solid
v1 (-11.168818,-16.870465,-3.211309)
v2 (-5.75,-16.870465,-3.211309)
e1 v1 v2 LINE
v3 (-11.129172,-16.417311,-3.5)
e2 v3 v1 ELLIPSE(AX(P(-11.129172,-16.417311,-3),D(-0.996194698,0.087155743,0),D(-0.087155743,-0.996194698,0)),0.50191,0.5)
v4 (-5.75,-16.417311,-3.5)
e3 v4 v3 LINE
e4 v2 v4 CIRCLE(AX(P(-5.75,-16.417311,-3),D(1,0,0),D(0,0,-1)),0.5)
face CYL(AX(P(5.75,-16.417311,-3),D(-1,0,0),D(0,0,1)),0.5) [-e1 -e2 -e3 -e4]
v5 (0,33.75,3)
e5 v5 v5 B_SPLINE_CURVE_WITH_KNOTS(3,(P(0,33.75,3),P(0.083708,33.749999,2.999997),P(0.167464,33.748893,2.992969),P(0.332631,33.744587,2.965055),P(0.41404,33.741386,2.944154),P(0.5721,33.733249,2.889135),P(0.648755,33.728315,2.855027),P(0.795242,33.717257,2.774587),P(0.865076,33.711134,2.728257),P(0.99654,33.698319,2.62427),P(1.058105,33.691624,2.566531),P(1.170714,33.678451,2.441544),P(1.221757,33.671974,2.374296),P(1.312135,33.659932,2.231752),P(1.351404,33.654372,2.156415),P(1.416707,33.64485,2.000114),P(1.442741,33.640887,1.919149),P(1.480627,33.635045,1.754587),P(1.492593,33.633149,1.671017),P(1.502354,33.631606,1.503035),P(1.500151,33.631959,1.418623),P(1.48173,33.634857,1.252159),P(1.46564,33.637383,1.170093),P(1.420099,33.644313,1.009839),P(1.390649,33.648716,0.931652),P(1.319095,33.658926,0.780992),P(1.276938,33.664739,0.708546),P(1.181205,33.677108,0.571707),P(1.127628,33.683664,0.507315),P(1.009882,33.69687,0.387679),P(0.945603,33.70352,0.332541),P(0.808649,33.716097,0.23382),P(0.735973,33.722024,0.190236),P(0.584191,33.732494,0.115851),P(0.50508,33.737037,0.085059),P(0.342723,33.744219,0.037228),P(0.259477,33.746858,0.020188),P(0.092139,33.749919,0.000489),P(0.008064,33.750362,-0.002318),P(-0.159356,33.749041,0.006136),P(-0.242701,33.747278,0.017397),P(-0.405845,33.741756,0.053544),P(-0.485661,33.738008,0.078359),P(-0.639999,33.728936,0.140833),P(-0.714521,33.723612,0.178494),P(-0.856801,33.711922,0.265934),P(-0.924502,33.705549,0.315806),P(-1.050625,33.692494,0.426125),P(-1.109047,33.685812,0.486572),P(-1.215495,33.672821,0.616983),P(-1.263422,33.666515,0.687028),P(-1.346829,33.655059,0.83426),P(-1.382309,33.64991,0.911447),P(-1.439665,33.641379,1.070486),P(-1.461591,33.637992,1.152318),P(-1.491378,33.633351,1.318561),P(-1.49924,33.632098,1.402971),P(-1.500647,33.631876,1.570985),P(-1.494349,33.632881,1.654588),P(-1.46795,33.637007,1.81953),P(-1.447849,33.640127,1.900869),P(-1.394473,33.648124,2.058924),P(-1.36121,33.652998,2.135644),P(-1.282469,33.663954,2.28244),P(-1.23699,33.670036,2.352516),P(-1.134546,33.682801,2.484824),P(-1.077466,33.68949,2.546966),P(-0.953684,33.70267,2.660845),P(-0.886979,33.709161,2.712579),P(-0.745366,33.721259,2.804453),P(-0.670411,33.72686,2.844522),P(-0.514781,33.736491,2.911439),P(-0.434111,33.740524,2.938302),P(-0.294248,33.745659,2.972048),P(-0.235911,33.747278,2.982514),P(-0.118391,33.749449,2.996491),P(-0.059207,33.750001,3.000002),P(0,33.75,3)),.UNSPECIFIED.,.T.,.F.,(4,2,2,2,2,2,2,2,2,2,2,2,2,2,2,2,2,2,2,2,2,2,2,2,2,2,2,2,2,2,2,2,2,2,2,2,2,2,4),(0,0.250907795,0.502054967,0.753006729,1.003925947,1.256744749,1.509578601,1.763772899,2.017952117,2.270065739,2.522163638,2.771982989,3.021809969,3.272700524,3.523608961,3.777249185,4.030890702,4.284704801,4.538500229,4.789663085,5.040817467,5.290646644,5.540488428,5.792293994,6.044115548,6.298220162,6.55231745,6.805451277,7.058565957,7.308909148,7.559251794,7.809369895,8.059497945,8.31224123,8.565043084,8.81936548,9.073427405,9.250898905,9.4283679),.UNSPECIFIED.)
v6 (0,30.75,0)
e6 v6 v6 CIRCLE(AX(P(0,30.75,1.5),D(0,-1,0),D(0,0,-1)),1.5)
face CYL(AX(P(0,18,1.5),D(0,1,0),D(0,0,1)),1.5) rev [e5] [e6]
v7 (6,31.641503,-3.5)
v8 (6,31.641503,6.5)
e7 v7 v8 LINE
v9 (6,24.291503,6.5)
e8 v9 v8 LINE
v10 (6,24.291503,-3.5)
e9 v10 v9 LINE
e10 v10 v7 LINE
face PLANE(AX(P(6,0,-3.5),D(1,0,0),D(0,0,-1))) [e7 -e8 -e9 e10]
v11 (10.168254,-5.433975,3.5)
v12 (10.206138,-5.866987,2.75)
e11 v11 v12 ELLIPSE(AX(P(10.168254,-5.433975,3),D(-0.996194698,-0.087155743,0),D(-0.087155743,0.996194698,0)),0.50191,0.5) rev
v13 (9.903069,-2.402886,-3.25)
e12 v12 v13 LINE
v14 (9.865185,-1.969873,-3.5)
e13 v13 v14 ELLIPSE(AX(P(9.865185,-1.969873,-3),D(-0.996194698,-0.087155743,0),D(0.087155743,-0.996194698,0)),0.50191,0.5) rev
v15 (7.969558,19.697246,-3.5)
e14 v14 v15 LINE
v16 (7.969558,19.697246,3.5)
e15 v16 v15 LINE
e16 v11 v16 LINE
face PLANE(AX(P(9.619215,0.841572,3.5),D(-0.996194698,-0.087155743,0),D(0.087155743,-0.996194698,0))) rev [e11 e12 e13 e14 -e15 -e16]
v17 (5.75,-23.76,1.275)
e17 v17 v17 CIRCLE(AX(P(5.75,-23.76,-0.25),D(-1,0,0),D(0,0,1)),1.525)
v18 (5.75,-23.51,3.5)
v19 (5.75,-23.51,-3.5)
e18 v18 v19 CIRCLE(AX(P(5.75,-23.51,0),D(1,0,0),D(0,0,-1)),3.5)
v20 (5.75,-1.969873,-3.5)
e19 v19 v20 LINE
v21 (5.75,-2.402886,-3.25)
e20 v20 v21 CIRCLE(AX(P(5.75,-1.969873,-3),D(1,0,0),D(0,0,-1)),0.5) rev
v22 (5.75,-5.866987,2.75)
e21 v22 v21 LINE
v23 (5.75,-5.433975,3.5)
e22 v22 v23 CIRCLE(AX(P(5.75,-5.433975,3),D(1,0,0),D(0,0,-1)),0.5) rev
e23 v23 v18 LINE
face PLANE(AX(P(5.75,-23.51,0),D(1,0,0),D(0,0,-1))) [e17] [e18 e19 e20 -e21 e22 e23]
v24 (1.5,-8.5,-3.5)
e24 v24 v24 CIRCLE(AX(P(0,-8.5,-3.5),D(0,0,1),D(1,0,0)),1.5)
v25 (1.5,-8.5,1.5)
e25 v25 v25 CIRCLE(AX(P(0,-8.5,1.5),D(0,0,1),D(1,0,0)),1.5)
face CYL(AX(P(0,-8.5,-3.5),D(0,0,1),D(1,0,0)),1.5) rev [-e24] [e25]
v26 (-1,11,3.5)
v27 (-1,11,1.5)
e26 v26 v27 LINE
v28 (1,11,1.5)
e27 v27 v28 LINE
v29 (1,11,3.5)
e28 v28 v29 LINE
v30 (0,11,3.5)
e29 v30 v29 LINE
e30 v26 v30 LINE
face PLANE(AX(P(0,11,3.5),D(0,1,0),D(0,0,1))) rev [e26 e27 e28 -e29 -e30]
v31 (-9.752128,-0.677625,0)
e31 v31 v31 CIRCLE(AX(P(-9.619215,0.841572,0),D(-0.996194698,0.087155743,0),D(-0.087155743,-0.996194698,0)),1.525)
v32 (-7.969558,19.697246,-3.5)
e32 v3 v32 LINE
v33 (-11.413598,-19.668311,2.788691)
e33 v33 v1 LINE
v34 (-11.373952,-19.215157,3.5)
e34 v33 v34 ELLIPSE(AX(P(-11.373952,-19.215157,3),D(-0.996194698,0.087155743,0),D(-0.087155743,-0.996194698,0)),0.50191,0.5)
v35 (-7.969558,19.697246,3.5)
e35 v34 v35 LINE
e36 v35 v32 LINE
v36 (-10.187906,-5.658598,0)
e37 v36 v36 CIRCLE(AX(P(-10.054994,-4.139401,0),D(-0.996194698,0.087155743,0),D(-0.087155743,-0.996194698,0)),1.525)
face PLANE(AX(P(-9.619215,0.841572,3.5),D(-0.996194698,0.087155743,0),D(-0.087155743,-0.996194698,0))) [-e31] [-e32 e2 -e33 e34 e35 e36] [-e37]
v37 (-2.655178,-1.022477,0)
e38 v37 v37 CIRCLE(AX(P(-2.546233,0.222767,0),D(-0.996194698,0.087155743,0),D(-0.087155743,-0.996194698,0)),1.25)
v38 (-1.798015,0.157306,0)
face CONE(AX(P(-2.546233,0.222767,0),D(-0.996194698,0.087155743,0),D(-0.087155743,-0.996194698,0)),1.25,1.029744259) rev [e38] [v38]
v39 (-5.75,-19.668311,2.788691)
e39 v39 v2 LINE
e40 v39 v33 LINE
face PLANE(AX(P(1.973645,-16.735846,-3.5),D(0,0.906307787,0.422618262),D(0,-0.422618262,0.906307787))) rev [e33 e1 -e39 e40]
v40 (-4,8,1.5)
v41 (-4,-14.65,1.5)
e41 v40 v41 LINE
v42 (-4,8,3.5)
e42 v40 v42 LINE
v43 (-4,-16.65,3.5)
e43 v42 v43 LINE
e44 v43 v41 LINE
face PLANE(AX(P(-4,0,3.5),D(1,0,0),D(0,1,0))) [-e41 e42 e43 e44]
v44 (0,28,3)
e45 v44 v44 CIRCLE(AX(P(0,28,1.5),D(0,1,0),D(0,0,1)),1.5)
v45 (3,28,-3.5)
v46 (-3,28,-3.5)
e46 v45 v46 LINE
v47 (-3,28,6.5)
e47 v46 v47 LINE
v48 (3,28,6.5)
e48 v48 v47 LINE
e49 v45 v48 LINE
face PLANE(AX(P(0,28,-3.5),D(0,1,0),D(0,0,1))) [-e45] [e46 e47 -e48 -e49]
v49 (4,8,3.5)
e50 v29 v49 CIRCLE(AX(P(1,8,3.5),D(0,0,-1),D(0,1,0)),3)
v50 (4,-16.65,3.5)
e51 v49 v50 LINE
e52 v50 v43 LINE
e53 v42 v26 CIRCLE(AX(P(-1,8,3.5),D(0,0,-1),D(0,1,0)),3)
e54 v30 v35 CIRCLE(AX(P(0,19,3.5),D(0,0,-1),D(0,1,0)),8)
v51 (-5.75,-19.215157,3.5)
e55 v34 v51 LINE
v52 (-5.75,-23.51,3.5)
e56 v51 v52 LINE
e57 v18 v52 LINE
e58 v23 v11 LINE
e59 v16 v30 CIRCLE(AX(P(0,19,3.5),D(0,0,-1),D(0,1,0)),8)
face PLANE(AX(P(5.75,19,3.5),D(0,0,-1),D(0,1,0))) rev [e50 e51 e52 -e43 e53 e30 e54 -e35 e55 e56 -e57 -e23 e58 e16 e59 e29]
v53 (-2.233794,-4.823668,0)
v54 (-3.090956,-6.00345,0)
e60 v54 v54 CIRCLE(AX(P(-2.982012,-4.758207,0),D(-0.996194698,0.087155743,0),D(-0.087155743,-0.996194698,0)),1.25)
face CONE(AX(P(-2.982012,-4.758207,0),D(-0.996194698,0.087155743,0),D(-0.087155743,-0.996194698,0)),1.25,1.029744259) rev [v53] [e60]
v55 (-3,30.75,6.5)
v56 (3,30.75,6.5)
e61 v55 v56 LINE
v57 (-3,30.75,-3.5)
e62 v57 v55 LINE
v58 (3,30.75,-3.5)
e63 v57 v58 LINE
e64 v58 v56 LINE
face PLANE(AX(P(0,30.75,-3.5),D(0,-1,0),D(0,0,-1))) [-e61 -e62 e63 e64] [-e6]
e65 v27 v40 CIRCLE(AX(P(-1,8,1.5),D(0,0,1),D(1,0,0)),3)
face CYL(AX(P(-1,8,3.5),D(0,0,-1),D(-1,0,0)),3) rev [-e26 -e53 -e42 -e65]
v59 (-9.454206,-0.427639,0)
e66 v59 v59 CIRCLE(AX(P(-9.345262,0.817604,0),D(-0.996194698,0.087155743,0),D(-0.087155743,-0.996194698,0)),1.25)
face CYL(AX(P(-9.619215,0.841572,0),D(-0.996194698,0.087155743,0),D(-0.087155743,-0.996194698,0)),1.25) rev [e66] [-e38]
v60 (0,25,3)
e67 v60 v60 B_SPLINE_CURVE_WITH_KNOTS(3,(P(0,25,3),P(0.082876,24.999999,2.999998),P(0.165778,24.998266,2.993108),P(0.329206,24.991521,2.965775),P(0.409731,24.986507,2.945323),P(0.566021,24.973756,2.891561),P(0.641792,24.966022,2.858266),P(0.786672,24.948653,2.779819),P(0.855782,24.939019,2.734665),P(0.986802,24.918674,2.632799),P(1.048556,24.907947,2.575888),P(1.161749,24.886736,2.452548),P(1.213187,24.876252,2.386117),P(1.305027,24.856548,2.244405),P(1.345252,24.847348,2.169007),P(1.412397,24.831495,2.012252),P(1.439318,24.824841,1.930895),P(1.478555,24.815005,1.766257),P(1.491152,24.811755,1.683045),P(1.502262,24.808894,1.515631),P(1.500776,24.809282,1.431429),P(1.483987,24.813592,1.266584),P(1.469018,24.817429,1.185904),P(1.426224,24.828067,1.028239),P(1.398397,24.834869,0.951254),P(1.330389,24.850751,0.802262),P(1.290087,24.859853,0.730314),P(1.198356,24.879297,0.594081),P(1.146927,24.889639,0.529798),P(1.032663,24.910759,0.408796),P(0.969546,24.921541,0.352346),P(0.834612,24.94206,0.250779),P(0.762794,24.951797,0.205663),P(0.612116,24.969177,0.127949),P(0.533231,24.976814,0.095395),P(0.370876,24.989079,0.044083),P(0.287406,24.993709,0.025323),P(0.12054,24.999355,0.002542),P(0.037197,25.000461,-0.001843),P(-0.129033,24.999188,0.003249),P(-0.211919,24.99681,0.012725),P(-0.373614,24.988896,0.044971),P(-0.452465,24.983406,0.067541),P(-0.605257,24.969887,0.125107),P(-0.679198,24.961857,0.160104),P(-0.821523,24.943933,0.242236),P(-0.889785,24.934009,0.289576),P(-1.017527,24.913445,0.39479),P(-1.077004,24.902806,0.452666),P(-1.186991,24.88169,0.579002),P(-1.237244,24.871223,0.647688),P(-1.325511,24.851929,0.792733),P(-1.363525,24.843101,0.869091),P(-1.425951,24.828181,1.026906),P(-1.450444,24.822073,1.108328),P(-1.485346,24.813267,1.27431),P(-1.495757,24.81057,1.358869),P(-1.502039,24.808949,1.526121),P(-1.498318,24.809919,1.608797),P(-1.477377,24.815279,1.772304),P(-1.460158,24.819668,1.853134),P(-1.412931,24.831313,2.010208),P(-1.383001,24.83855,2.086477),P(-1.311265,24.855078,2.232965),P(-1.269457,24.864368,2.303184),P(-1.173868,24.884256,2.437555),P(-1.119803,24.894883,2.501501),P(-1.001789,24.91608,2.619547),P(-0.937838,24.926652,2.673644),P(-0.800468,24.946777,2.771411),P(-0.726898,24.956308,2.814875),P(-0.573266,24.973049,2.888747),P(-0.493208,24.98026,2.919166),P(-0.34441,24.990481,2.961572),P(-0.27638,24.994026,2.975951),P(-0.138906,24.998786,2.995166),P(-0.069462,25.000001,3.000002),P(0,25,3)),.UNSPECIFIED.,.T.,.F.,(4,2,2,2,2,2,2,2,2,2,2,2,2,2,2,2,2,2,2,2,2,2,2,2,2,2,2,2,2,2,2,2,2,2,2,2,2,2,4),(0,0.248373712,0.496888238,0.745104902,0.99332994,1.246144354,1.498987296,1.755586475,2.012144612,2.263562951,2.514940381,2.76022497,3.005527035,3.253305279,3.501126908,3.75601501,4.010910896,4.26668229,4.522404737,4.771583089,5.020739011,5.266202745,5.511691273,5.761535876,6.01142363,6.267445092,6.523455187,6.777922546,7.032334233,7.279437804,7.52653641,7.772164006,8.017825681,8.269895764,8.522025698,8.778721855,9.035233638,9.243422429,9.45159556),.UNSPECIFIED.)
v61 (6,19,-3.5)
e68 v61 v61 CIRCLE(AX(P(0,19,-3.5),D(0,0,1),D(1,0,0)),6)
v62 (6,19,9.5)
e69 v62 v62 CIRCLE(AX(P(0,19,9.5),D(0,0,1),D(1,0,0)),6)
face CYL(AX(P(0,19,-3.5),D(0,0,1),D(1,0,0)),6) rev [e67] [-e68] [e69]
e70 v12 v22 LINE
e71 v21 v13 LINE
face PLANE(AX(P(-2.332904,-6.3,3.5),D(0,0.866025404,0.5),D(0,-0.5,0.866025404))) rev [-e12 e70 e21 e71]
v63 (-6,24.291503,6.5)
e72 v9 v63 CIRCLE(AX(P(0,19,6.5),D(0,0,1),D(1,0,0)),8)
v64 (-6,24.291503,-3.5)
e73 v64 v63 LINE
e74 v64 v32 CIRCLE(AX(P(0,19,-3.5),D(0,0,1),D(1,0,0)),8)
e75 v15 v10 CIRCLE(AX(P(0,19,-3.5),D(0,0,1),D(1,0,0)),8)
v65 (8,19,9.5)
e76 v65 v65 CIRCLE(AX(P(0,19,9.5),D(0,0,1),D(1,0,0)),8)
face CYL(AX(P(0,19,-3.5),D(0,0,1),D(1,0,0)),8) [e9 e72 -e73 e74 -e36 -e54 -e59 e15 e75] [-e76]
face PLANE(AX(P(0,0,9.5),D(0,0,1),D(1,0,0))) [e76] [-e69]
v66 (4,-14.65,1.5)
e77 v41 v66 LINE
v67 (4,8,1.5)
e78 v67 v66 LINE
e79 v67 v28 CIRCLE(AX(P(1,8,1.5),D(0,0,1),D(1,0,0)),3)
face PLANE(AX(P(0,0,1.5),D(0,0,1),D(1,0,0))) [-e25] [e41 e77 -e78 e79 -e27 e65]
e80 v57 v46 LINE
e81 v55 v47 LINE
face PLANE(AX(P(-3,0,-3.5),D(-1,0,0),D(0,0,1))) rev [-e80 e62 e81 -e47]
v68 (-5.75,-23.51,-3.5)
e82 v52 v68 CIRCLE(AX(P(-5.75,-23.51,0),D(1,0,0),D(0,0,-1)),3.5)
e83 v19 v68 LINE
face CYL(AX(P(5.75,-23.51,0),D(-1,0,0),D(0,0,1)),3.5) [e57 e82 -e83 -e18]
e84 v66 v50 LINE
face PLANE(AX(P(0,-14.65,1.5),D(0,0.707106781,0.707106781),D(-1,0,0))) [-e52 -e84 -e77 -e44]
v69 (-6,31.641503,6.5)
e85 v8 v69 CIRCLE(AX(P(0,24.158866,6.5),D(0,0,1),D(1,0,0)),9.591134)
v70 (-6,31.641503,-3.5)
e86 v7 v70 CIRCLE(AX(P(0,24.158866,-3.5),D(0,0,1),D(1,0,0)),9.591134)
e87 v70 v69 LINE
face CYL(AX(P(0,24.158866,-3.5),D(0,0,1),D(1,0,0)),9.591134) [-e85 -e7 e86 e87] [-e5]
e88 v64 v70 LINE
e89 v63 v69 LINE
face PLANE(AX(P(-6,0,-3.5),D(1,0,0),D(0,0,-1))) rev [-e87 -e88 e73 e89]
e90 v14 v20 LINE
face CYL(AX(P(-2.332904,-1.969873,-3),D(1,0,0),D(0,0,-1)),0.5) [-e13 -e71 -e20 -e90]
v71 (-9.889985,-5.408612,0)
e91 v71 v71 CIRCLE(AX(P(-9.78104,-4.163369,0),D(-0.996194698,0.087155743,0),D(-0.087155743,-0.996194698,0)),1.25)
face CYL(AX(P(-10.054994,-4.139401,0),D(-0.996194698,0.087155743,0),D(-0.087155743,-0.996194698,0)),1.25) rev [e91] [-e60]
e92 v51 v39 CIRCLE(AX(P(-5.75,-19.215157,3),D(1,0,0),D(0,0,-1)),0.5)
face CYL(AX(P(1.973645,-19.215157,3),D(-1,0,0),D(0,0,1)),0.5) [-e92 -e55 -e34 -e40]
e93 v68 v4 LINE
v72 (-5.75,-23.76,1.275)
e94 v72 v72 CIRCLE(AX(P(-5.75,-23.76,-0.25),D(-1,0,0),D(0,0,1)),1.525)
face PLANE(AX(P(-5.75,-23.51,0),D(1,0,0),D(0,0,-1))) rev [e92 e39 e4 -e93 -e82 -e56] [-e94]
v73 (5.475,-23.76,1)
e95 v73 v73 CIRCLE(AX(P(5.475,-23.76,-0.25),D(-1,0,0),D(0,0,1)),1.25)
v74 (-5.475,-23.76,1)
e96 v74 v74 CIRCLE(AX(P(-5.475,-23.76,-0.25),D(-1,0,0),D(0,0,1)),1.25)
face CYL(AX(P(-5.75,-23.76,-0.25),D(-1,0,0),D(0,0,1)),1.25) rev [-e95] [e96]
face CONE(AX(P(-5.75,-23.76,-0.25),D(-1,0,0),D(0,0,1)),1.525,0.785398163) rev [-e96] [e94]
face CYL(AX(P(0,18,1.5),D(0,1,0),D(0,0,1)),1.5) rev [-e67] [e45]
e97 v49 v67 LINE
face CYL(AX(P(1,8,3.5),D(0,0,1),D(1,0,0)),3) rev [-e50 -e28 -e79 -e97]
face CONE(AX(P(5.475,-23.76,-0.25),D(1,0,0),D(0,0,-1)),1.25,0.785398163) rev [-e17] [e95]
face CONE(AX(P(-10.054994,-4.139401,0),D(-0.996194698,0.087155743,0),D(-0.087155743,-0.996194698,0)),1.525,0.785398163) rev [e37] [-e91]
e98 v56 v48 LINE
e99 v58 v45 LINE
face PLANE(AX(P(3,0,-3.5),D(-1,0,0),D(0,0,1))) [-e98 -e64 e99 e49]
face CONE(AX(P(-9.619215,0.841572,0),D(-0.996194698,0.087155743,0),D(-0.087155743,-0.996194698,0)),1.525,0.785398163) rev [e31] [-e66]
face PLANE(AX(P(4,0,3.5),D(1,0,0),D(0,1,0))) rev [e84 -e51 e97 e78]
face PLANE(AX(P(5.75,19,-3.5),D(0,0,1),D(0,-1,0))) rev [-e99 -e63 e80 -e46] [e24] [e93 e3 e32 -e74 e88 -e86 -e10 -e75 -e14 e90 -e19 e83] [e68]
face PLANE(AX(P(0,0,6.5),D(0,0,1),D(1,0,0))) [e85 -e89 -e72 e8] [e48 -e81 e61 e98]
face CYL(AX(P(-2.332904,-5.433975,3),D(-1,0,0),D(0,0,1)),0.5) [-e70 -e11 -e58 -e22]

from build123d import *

# Parameters (mm, degrees)
SKETCH1_R                = 1
BOSS_EXTRUDE1_DEPTH      = 5.75
BOSS_EXTRUDE2_DEPTH      = 6.5
BOSS_EXTRUDE2_DEPTH_BACK = 3.5
SKETCH3_W                = 6
SKETCH3_H                = 2.75
BOSS_EXTRUDE3_DEPTH      = 9.5
BOSS_EXTRUDE3_DEPTH_BACK = 3.5
SKETCH3_5_R              = 8
SKETCH3_5_R_2            = 6
CUT_EXTRUDE1_DEPTH       = 36.96265424
CUT_EXTRUDE1_DEPTH_BACK  = 36.96265424
SKETCH3_6_R              = 6
SKETCH3_6_R_2            = 1.5
CUT_EXTRUDE3_START       = 1.5
SKETCH3_8_R              = 1.5
CUT_EXTRUDE3_DEPTH       = 2
FILLET1_R                = 3
CHAMFER1_SIZE            = 2
BOSS_EXTRUDE4_DEPTH      = 3.5
CUT_EXTRUDE5_DEPTH       = 4.494021888
CUT_EXTRUDE6_DEPTH       = 5.692616578
FILLET2_R                = 0.5
CUT_EXTRUDE8_DEPTH       = 57.979942817
CUT_EXTRUDE8_DEPTH_BACK  = 10
SKETCH11_R               = 1.5
LPATTERN1_COUNT          = 2
LPATTERN1_PITCH          = 5
SKETCH14_R               = 1
BOSS_EXTRUDE5_DEPTH      = 11.5


with BuildPart() as part:
    # Sketch1 → Boss-Extrude1 (new, symmetric)
    with BuildSketch(Plane(origin=(0, 0, 0), x_dir=(0, 0, -1), z_dir=(1, 0, 0))):
        with BuildLine():
            Line((-3.5, 19), (3.5, 19))
            Line((3.5, 19), (3.5, -23.51))
            ThreePointArc((3.5, -23.51), (0, -27.01), (-3.5, -23.51))
            Line((-3.5, -23.51), (-3.5, 19))
        make_face()
        with Locations((0.25, -23.76)):
            Circle(SKETCH1_R, mode=Mode.SUBTRACT)
    extrude(amount=BOSS_EXTRUDE1_DEPTH, both=True)



with BuildPart() as body_2:
    # Sketch3 → Boss-Extrude2 (new, two sides: drawn at the far end of the back side and taken through both)
    with BuildSketch(Plane.XY.offset(-BOSS_EXTRUDE2_DEPTH_BACK)):
        with BuildLine():
            ThreePointArc((-6, 24.291502622), (0, 27), (6, 24.291502622))
            Line((6, 24.291502622), (6, 31.641502622))
            ThreePointArc((6, 31.641502622), (0, 33.75), (-6, 31.641502622))
            Line((-6, 31.641502622), (-6, 24.291502622))
        make_face()
        with Locations((0, 29.375)):
            Rectangle(SKETCH3_W, SKETCH3_H, mode=Mode.SUBTRACT)
    extrude(amount=BOSS_EXTRUDE2_DEPTH + BOSS_EXTRUDE2_DEPTH_BACK)


with BuildPart() as part_1:
    add(part.part)

    add(body_2.part)  # Boss-Extrude3 merges body 2
    # Sketch3<5> → Boss-Extrude3 (add, two sides: drawn at the far end of the back side and taken through both)
    with BuildSketch(Plane.XY.offset(-BOSS_EXTRUDE3_DEPTH_BACK)):
        with Locations((0, 19)):
            Circle(SKETCH3_5_R)
        with Locations((0, 19)):
            Circle(SKETCH3_5_R_2, mode=Mode.SUBTRACT)
    extrude(amount=BOSS_EXTRUDE3_DEPTH + BOSS_EXTRUDE3_DEPTH_BACK)

    # Sketch3<6> → Cut-Extrude1 (cut, two sides: drawn at the far end of the back side and taken through both)
    with BuildSketch(Plane.XY.offset(-CUT_EXTRUDE1_DEPTH_BACK)):
        with Locations((0, 19)):
            Circle(SKETCH3_6_R)
        with Locations((0, -8.5)):
            Circle(SKETCH3_6_R_2)
    extrude(amount=CUT_EXTRUDE1_DEPTH + CUT_EXTRUDE1_DEPTH_BACK, mode=Mode.SUBTRACT)

    # Sketch3<8> → Cut-Extrude3 (cut)
    with BuildSketch(Plane.XY.offset(CUT_EXTRUDE3_START)):
        Polygon((4, -14.65), (4, 11), (0, 11), (-4, 11), (-4, -14.65), align=None)
        with Locations((0, -8.5)):
            Circle(SKETCH3_8_R, mode=Mode.SUBTRACT)
    extrude(amount=CUT_EXTRUDE3_DEPTH, mode=Mode.SUBTRACT)

    # Fillet1
    fillet1_edges = [part_1.edges().sort_by_distance(p)[0] for p in [
        (4, 11, 2.5),
        (-4, 11, 2.5),
    ]]
    fillet(fillet1_edges, radius=FILLET1_R)

    # Chamfer1
    chamfer1_edges = [part_1.edges().sort_by_distance(p)[0] for p in [
        (0, -14.65, 3.5),
    ]]
    chamfer(chamfer1_edges, length=CHAMFER1_SIZE - 0.0001)  # a hair under: the kernel refuses the full size

    # Sketch6 → Boss-Extrude4 (add, symmetric)
    with BuildSketch(Plane.XY):
        with BuildLine():
            Line((-5.75, -20), (-5.75, 13.437851135))
            ThreePointArc((-5.75, 13.437851135), (-7.539998072, 16.32634537), (-7.969557585, 19.697245942))
            Line((-7.969557585, 19.697245942), (-11.442616578, -20))
            Line((-11.442616578, -20), (-5.75, -20))
        make_face()
        with BuildLine():
            ThreePointArc((5.75, 13.437851135), (7.539998072, 16.32634537), (7.969557585, 19.697245942))
            Line((7.969557585, 19.697245942), (10.244021888, -6.3))
            Line((10.244021888, -6.3), (5.75, -6.3))
            Line((5.75, -6.3), (5.75, 13.437851135))
        make_face()
    extrude(amount=BOSS_EXTRUDE4_DEPTH, both=True)

    # Sketch8 → Cut-Extrude5 (cut)
    with BuildSketch(Plane(origin=(10.244021888, 0, 0), x_dir=(0, 0, -1), z_dir=(1, 0, 0))):
        Polygon((-3.5, -6.3), (3.5, -2.258548116), (3.5, -6.3), align=None)
    extrude(amount=-CUT_EXTRUDE5_DEPTH, mode=Mode.SUBTRACT)

    # Sketch9 → Cut-Extrude6 (cut)
    with BuildSketch(Plane.ZY.offset(11.442616578)):
        Polygon((-3.5, -20), (-3.5, -16.735846393), (3.5, -20), align=None)
    extrude(amount=-CUT_EXTRUDE6_DEPTH, mode=Mode.SUBTRACT)

    # Fillet2
    fillet2_edges = [part_1.edges().sort_by_distance(p)[0] for p in [
        (-8.596308289, -20, 3.5),
        (7.997010944, -6.3, 3.5),
        (7.820220332, -2.258548116, -3.5),
        (-8.453520071, -16.735846393, -3.5),
    ]]
    fillet(fillet2_edges, radius=FILLET2_R)

    # Sketch11 → Cut-Extrude8 (cut, two sides: drawn at the far end of the back side and taken through both)
    with BuildSketch(Plane(origin=(0, 28, 0), x_dir=(1, 0, 0), z_dir=(0, 1, 0)).offset(-CUT_EXTRUDE8_DEPTH_BACK)):
        with Locations(Location((0, -1.5, 0), (0, 0, 270))):
            Circle(SKETCH11_R)
    extrude(amount=CUT_EXTRUDE8_DEPTH + CUT_EXTRUDE8_DEPTH_BACK, mode=Mode.SUBTRACT)

    # Sketch13 → M3 Tapped Hole1 (revolve, cut)
    with BuildSketch(Plane(origin=(-9.619215273, 0.841572288, 0), x_dir=(-0.08715574274765137, -0.9961946980917462, 0), z_dir=(0, 0, 1))):
        Polygon((0, 0), (0, 7.851075774), (1.25, 7.1), (1.25, 0.275), (1.525, 0), align=None)
    m3_tapped_hole1 = revolve(axis=Axis((-15.945051605, 1.395011255, 0), (0.996194698091746, -0.08715574274765134, 0)), mode=Mode.SUBTRACT)

    # LPattern1: M3 Tapped Hole1 ×2
    with Locations(*[Vector(-0.08715574274765112, -0.9961946980917462, 0) * (i * LPATTERN1_PITCH) for i in range(1, LPATTERN1_COUNT)]):
        add(m3_tapped_hole1, mode=Mode.SUBTRACT)

    # Sketch14 → Boss-Extrude5 (add)
    with BuildSketch(Plane.ZY.offset(5.75)):
        with Locations((-0.25, -23.76)):
            Circle(SKETCH14_R)
    extrude(amount=-BOSS_EXTRUDE5_DEPTH)

    # Sketch16 → M3 Tapped Hole2 (revolve, cut)
    with BuildSketch(Plane(origin=(-5.75, -23.76, -0.25), x_dir=(0, 0, 1), z_dir=(0, 1, 0))):
        Polygon((0, 0), (0, 11.5), (1.525, 11.5), (1.25, 11.225), (1.25, 0.275), (1.525, 0), align=None)
    revolve(axis=Axis((-12.1, -23.76, -0.25), (1, 0, 0)), mode=Mode.SUBTRACT)


solid = part_1.part
